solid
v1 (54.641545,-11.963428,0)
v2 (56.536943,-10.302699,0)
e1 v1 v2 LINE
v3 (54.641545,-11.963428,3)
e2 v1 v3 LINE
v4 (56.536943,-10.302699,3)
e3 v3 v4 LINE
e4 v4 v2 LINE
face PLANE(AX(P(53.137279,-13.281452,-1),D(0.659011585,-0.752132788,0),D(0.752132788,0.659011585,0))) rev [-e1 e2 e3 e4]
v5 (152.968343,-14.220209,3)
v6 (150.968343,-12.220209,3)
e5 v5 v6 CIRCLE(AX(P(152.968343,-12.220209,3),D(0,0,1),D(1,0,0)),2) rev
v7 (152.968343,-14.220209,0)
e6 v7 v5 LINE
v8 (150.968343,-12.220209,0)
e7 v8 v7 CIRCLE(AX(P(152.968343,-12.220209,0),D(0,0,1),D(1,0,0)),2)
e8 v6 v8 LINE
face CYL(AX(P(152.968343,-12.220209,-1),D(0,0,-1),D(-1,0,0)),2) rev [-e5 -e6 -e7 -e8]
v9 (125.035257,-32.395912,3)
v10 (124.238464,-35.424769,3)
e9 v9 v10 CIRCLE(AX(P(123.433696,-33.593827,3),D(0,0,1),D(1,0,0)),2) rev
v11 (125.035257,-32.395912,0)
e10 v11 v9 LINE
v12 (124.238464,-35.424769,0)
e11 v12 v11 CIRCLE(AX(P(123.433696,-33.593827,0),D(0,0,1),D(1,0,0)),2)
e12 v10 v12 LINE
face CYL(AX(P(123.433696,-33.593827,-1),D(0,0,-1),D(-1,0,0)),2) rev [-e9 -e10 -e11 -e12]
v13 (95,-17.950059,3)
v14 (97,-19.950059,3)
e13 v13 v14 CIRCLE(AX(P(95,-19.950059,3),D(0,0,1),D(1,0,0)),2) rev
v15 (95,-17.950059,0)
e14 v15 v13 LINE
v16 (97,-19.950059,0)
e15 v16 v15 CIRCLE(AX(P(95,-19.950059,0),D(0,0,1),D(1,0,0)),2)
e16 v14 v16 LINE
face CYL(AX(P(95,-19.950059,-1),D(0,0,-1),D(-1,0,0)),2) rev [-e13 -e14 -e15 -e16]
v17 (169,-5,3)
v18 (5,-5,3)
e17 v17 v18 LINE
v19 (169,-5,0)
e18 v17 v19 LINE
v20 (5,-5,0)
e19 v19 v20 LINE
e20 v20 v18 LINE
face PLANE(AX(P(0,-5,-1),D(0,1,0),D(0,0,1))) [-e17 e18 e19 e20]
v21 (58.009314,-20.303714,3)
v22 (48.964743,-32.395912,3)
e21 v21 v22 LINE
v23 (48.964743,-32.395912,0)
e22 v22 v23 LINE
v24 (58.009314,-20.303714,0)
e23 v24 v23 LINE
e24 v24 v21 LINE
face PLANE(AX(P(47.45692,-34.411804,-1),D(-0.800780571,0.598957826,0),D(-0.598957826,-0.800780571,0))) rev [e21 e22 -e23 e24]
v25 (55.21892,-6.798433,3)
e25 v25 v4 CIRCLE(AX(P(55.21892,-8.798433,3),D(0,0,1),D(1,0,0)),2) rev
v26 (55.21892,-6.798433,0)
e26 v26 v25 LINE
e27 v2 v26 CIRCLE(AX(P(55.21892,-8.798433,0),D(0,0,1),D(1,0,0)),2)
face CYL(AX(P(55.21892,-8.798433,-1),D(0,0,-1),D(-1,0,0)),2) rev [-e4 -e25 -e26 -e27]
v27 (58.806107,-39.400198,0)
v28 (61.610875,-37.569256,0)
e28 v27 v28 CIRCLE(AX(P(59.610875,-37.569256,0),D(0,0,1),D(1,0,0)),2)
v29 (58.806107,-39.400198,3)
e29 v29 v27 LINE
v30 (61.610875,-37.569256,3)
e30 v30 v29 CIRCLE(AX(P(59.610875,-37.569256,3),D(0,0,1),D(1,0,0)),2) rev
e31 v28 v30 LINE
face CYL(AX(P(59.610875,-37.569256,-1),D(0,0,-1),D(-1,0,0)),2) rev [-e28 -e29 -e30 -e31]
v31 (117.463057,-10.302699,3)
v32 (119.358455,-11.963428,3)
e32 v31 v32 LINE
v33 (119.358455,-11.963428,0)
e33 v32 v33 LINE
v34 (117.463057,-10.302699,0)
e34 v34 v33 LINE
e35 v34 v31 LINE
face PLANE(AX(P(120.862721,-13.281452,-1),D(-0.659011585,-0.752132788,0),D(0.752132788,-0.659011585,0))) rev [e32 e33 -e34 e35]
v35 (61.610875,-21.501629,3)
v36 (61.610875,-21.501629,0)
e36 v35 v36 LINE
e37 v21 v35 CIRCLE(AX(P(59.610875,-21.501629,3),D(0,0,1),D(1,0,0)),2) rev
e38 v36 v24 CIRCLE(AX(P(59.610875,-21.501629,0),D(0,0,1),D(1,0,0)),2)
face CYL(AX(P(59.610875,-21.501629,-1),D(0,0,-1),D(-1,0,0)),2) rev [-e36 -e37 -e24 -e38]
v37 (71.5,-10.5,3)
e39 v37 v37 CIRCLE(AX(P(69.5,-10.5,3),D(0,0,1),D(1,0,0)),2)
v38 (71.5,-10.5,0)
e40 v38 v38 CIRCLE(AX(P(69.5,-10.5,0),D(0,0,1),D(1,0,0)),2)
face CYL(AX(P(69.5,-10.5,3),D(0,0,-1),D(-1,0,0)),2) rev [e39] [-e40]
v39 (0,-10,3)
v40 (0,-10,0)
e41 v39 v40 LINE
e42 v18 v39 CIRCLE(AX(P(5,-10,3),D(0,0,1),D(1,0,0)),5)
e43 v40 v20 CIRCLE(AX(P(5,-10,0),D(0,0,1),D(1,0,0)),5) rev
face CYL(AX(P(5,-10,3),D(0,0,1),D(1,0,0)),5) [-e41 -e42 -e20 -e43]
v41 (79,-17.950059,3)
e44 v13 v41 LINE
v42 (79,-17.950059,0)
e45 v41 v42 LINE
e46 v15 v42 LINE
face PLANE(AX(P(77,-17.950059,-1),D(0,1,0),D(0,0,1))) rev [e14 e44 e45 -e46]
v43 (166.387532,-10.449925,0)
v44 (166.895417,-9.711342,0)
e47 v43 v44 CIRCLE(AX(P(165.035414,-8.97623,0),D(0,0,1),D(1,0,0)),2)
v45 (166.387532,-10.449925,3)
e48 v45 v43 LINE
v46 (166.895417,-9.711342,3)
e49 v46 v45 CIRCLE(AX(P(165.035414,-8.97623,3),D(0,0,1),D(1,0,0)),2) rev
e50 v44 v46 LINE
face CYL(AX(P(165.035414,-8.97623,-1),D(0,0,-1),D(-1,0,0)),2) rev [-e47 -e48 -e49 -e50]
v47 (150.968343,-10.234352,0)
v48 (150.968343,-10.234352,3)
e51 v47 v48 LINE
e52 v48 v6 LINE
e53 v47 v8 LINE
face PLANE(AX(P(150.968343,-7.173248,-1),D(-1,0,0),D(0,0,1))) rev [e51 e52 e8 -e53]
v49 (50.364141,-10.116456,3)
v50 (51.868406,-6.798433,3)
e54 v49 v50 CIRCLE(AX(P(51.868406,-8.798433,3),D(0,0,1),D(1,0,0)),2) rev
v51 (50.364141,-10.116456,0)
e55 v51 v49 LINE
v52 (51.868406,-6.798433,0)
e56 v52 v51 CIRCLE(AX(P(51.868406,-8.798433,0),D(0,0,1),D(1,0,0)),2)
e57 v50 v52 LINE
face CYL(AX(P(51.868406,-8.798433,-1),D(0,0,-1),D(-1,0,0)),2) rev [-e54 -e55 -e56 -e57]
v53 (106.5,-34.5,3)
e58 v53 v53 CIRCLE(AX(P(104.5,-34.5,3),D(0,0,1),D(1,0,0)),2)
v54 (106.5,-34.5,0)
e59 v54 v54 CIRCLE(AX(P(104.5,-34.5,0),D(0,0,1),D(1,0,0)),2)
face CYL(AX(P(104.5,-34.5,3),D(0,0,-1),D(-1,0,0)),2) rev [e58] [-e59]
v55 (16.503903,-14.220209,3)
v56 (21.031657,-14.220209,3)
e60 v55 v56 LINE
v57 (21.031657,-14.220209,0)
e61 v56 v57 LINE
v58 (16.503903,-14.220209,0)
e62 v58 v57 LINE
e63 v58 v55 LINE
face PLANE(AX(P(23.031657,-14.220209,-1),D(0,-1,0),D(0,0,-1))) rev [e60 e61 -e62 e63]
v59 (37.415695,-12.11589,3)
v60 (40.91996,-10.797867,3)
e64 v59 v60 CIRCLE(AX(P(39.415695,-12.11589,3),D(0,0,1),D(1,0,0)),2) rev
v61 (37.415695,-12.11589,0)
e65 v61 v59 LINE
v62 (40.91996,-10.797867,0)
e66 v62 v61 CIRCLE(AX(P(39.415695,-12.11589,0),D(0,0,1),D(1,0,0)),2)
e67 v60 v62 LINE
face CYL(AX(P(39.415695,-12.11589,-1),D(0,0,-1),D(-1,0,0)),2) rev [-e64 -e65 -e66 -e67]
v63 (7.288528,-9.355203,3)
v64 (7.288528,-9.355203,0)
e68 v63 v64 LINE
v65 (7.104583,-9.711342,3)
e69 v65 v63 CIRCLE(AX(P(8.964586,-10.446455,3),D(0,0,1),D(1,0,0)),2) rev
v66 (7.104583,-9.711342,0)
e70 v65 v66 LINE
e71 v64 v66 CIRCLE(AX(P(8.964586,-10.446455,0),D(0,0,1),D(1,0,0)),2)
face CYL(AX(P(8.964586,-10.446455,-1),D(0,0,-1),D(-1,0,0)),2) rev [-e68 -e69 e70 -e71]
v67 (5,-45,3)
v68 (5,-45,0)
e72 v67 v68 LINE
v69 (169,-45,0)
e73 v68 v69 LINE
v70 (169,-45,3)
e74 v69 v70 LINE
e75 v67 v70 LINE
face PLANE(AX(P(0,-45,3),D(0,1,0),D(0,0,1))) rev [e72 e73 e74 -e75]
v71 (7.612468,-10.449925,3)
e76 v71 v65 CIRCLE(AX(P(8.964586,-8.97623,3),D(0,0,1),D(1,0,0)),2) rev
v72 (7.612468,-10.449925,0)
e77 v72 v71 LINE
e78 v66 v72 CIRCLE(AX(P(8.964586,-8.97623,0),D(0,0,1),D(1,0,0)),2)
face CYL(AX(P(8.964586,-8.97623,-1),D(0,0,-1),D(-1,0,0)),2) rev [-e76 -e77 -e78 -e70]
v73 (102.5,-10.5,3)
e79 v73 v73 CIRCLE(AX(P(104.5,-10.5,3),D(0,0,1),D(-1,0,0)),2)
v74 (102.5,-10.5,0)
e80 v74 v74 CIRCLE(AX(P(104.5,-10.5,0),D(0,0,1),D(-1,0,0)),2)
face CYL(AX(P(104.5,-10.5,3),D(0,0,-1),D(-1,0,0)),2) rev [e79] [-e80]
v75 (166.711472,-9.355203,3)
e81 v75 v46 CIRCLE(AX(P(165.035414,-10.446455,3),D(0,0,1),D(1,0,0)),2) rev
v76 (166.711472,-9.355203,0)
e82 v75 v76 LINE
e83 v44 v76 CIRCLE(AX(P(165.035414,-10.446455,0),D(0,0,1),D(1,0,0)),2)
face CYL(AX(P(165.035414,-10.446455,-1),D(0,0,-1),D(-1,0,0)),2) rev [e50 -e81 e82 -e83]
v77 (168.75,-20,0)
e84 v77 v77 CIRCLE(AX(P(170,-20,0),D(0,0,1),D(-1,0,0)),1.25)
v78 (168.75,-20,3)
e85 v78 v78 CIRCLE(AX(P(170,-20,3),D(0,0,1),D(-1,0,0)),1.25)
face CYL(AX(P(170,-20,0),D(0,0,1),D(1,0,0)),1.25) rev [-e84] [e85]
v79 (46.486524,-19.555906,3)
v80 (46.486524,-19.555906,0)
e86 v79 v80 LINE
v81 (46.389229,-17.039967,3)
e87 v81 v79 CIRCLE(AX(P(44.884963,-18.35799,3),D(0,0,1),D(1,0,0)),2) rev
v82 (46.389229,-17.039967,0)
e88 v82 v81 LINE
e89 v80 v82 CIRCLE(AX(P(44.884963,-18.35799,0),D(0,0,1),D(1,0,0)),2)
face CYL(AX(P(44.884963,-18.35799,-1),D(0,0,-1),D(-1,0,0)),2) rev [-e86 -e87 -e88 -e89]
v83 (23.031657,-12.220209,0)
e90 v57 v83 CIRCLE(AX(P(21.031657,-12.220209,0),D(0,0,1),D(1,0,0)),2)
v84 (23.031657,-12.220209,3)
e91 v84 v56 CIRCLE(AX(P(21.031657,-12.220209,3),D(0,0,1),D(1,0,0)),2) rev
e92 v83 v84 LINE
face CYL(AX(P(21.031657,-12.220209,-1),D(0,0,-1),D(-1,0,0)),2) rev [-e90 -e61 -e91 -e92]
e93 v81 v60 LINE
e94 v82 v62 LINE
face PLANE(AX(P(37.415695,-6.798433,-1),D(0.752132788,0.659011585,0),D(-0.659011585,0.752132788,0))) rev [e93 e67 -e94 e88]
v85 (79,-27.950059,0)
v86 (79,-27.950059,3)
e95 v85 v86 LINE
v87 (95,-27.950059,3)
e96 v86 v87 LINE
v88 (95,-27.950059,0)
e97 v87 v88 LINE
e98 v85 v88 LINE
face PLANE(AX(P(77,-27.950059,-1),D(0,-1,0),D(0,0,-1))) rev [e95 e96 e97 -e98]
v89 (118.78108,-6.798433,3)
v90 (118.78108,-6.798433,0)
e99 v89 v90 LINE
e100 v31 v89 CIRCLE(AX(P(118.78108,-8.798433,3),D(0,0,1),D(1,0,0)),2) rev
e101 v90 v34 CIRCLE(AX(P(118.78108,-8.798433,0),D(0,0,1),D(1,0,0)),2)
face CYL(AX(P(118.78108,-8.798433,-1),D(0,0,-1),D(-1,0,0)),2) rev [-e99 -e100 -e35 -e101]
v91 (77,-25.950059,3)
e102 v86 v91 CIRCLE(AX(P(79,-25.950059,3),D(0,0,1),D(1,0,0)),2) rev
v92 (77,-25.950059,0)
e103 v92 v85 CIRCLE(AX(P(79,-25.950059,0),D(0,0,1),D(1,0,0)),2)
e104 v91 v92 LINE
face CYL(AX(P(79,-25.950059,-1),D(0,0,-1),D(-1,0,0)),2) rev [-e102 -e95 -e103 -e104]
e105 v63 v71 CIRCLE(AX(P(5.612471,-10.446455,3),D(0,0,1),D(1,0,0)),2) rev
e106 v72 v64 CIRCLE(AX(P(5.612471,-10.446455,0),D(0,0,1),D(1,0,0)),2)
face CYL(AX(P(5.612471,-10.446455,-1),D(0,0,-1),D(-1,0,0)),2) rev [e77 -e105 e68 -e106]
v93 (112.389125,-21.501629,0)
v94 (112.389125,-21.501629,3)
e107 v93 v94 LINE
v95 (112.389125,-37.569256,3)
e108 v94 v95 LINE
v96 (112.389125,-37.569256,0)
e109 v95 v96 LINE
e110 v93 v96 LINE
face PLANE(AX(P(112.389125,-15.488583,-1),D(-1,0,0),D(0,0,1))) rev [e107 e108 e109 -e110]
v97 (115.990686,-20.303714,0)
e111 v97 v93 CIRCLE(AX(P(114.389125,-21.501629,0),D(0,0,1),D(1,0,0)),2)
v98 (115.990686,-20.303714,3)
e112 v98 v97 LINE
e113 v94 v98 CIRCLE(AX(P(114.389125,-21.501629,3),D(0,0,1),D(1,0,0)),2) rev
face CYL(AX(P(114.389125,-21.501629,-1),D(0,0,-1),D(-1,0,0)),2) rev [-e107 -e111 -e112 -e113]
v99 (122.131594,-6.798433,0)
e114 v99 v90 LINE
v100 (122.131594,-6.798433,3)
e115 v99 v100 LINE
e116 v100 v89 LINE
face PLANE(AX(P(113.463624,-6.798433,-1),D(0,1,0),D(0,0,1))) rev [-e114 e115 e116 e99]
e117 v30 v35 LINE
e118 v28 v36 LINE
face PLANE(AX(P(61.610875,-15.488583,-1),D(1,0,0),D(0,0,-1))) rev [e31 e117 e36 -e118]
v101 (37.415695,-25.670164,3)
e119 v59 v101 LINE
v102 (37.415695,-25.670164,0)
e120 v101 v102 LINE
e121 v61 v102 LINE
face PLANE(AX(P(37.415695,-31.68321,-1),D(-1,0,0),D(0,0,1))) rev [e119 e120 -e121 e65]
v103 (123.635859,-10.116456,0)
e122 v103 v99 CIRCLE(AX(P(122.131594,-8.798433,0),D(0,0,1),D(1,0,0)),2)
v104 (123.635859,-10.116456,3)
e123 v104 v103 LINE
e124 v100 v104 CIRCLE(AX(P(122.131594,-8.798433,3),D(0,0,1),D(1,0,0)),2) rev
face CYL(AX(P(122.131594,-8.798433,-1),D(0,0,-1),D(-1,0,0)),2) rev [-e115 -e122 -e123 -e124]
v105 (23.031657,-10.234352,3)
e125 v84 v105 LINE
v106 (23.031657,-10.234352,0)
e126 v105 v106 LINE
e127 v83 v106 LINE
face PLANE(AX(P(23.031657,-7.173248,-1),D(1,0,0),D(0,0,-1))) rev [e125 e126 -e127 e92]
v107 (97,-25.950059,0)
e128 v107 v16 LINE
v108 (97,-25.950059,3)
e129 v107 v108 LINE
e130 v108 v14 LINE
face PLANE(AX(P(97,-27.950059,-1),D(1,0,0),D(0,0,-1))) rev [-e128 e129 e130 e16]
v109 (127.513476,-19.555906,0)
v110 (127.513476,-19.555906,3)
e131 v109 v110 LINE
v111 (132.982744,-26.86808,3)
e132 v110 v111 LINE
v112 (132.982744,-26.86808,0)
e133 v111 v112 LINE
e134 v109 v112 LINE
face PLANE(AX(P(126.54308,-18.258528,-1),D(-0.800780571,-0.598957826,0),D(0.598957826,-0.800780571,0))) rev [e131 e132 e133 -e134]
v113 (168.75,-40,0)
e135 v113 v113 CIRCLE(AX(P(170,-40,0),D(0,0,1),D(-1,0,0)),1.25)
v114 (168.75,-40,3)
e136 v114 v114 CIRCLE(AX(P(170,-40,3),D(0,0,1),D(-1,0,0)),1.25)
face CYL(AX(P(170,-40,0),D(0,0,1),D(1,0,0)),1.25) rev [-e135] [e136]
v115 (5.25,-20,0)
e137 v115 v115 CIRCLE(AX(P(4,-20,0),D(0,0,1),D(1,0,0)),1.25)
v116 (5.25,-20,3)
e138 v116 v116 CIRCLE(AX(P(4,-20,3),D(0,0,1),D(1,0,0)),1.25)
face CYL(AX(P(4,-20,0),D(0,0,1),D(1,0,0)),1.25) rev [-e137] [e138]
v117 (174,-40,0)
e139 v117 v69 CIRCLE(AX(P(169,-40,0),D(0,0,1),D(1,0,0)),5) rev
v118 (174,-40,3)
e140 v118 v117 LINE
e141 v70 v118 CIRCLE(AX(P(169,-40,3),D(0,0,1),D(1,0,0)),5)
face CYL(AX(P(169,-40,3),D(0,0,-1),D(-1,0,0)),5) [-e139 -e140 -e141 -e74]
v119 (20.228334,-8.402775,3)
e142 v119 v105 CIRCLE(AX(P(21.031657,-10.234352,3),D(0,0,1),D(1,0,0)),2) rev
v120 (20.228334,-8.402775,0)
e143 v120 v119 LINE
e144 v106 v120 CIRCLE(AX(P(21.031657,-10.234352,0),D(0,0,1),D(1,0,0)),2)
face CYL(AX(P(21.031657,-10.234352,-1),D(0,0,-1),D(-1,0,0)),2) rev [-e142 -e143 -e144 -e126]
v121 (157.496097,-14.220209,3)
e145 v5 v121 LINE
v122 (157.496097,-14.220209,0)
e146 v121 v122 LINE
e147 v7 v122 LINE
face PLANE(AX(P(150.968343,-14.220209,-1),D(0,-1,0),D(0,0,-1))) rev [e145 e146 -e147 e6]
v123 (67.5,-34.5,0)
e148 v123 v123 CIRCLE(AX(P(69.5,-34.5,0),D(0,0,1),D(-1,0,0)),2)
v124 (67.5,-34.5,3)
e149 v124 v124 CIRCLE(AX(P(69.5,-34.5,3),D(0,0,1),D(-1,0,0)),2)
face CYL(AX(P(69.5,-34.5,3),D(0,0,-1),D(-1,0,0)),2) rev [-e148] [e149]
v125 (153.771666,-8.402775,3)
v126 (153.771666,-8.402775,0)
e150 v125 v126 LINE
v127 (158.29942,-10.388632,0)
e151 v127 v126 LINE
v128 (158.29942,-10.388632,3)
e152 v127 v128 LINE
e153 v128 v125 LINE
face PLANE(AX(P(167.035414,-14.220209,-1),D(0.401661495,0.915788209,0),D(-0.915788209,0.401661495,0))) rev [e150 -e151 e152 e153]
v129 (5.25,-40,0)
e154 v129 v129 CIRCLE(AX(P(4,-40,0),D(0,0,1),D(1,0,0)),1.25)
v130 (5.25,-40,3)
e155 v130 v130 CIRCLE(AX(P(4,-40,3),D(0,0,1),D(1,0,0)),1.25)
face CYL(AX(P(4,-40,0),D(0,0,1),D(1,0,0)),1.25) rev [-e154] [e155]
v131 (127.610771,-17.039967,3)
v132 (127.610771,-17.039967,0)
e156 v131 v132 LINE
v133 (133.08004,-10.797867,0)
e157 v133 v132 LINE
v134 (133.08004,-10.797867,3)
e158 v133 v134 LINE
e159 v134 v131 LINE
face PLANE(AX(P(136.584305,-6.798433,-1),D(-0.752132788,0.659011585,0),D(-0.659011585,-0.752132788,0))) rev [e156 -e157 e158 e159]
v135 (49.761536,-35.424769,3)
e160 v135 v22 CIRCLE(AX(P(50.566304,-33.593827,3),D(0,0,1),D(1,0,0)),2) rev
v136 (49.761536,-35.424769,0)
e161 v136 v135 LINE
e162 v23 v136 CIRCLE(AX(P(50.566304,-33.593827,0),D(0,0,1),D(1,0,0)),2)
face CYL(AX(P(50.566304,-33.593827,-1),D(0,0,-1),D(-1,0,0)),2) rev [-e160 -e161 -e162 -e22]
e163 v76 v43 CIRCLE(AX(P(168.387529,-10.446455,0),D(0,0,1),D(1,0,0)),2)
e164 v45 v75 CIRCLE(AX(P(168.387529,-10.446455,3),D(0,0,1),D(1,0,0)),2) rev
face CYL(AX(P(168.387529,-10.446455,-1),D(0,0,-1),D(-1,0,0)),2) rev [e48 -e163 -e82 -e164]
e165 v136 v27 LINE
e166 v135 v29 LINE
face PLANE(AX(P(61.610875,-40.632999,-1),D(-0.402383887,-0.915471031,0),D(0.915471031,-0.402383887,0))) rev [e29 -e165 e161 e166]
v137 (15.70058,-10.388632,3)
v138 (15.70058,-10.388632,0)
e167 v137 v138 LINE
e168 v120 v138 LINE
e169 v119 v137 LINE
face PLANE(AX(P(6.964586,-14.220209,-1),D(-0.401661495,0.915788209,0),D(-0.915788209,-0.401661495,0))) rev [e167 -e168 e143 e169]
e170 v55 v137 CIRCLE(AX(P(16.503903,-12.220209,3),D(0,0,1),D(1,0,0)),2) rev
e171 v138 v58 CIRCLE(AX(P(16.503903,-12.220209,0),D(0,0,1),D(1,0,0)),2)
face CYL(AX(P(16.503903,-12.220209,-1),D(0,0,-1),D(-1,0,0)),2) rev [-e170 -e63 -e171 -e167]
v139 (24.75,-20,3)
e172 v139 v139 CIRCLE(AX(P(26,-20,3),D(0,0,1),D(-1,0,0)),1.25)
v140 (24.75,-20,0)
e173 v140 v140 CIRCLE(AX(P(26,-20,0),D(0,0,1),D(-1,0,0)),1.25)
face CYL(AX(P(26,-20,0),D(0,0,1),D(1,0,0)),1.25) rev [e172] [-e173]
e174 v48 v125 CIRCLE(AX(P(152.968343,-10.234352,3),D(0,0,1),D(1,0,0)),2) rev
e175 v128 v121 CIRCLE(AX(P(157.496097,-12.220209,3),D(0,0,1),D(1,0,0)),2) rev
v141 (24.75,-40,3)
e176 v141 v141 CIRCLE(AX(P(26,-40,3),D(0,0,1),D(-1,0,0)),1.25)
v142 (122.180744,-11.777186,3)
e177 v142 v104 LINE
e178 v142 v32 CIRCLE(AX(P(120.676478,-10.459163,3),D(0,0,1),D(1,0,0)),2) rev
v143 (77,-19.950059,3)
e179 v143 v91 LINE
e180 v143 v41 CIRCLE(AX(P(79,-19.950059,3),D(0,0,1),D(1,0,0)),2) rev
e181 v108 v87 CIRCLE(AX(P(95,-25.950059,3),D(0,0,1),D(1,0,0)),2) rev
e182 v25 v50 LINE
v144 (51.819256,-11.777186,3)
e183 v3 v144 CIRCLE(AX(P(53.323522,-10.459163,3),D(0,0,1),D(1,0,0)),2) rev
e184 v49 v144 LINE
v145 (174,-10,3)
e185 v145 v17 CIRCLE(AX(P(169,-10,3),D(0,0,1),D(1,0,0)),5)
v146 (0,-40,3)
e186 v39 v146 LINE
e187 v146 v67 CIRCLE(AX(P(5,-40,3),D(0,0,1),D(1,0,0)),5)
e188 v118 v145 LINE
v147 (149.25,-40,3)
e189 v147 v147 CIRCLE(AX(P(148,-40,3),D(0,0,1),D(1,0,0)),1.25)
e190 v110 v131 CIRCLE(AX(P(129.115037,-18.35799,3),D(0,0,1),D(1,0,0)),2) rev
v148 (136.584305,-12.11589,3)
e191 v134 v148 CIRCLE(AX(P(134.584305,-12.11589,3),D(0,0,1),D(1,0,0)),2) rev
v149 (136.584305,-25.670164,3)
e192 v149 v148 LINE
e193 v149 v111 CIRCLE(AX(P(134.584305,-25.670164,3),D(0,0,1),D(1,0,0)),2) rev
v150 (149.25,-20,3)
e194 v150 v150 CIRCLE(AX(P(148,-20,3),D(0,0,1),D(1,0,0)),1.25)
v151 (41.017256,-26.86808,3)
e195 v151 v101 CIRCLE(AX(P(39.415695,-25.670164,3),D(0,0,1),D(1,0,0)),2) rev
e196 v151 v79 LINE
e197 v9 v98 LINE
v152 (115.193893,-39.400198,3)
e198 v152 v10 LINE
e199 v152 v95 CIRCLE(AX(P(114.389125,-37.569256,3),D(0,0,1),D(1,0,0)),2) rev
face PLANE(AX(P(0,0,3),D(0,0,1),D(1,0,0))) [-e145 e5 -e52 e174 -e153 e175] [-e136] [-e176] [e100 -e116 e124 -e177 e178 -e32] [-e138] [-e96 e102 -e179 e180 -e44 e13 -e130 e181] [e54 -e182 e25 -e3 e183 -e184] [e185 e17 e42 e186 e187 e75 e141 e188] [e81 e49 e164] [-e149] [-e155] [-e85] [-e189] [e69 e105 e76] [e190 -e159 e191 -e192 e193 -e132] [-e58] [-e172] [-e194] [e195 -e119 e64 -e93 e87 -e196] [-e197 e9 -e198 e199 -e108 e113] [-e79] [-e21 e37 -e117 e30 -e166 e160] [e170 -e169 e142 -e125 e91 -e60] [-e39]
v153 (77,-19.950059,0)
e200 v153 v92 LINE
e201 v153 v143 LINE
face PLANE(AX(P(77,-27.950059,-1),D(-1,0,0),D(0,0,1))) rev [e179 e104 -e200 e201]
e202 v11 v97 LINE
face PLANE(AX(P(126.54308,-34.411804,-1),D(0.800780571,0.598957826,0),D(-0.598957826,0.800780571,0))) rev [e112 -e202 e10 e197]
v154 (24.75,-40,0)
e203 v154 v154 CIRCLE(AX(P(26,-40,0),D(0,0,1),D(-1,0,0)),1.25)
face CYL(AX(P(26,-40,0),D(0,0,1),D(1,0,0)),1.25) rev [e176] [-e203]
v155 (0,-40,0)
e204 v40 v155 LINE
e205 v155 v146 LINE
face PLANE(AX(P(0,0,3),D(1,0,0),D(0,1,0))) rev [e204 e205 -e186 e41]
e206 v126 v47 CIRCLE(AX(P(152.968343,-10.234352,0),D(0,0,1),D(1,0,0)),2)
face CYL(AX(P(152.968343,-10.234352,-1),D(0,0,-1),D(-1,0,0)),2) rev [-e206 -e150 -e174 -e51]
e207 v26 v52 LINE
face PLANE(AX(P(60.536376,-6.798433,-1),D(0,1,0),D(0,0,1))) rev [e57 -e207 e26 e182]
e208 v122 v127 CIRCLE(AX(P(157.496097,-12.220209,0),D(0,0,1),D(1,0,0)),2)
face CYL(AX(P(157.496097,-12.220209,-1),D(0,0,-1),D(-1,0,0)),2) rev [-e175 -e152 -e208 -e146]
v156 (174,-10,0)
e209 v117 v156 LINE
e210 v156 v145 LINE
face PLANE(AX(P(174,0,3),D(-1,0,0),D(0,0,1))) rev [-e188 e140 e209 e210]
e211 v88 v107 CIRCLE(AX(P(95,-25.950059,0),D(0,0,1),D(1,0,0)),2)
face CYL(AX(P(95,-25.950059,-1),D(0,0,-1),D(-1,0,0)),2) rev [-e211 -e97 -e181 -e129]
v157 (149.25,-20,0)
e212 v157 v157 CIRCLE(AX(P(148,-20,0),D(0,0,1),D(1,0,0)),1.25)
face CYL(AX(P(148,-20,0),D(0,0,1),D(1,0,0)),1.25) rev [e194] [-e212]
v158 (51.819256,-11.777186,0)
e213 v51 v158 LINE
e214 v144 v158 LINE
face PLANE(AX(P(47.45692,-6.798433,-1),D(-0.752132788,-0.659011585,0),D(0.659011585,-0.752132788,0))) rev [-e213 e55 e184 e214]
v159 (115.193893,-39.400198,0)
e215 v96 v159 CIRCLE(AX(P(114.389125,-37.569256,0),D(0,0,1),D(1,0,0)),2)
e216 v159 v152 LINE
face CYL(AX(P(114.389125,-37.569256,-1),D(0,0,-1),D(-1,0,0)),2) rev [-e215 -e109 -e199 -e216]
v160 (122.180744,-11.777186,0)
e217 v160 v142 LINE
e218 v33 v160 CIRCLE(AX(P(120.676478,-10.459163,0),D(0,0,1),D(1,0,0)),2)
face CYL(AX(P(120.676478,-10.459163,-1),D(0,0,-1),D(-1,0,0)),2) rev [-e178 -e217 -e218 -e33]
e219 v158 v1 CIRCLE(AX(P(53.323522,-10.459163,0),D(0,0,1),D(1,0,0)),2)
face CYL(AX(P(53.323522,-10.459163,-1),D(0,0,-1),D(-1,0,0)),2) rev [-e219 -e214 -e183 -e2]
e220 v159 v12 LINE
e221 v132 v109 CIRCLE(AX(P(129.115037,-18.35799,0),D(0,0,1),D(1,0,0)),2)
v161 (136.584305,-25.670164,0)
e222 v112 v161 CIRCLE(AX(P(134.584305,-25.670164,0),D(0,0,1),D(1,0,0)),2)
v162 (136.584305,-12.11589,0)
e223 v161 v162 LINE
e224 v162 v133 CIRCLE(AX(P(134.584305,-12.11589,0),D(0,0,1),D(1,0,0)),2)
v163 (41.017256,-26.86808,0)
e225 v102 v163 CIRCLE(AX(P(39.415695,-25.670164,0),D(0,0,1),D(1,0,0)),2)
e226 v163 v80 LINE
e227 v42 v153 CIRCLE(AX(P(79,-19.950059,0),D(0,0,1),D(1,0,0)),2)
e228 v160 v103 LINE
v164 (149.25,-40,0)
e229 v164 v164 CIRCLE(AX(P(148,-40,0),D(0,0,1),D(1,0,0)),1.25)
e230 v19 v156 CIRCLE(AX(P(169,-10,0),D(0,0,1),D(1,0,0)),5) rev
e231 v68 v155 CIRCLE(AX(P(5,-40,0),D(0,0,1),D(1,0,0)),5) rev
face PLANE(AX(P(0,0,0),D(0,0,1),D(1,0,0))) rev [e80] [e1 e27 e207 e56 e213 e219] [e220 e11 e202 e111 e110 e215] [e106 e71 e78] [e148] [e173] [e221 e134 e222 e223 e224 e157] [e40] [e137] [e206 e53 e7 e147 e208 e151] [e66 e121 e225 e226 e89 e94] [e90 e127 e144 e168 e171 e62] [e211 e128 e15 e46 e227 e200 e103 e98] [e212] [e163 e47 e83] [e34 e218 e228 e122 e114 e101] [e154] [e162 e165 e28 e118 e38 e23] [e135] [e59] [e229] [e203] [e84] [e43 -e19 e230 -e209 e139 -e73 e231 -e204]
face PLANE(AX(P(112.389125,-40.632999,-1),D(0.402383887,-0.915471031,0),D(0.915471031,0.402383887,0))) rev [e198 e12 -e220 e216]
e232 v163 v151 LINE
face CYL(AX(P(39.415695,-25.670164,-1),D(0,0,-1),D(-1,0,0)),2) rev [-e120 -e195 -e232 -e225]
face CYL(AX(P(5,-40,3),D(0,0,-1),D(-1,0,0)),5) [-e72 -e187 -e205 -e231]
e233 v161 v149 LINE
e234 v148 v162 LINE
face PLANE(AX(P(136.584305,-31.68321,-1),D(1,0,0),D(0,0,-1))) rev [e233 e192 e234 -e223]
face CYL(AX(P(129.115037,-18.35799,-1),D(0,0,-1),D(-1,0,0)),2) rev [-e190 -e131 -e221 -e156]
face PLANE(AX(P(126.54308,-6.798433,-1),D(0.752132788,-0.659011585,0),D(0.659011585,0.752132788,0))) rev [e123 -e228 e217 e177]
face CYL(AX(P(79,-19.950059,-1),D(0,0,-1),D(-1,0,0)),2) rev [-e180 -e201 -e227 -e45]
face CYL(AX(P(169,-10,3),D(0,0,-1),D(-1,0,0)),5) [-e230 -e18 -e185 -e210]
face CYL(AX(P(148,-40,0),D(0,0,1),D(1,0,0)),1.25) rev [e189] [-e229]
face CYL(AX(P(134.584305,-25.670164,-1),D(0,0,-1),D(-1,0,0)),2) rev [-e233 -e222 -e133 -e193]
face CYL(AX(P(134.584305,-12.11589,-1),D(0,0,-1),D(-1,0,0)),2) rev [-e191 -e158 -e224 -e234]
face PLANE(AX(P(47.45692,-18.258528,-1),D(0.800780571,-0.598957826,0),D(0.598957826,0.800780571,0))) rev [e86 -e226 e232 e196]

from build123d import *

# Parameters (mm, degrees)
SKETCH_1_W          = 174
SKETCH_1_H          = 45
SKETCH_1_R          = 2
EXTRUDE_1_DEPTH     = 3
SKETCH_2_R          = 1.25
CUT_EXTRUDE_1_DEPTH = 3
SKETCH_3_W          = 20
SKETCH_3_H          = 10
CUT_EXTRUDE_2_DEPTH = 4
FILLET_1_R          = 2
FILLET_2_R          = 5
SKETCH_4_W          = 93.235772227
SKETCH_4_H          = 5
CUT_EXTRUDE_3_DEPTH = 4
FILLET_3_R          = 5


with BuildPart() as part:
    # 草图1 → 凸台-拉伸1 (new body)
    with BuildSketch(Plane.XY):
        with Locations((87, -22.5)):
            Rectangle(SKETCH_1_W, SKETCH_1_H)
        with Locations((69.5, -10.5)):
            Circle(SKETCH_1_R, mode=Mode.SUBTRACT)
        with Locations(Location((104.5, -10.5, 0), (0, 0, 180))):
            Circle(SKETCH_1_R, mode=Mode.SUBTRACT)
        with Locations(Location((69.5, -34.5, 0), (0, 0, 180))):
            Circle(SKETCH_1_R, mode=Mode.SUBTRACT)
        with Locations((104.5, -34.5)):
            Circle(SKETCH_1_R, mode=Mode.SUBTRACT)
    extrude(amount=EXTRUDE_1_DEPTH)

    # 草图2 → 切除-拉伸1 (cut)
    with BuildSketch(Plane.XY.offset(3)):
        with Locations((148, -20)):
            Circle(SKETCH_2_R)
        with Locations((148, -40)):
            Circle(SKETCH_2_R)
        with Locations(Location((26, -40, 0), (0, 0, 180))):
            Circle(SKETCH_2_R)
        with Locations(Location((26, -20, 0), (0, 0, 180))):
            Circle(SKETCH_2_R)
        with Locations((4, -20)):
            Circle(SKETCH_2_R)
        with Locations((4, -40)):
            Circle(SKETCH_2_R)
        with Locations(Location((170, -40, 0), (0, 0, 180))):
            Circle(SKETCH_2_R)
        with Locations(Location((170, -20, 0), (0, 0, 180))):
            Circle(SKETCH_2_R)
    extrude(amount=-CUT_EXTRUDE_1_DEPTH, mode=Mode.SUBTRACT)

    # 草图3 → 切除-拉伸2 (cut)
    with BuildSketch(Plane.XY.offset(3)):
        Polygon((6.964585687, -8.446455347), (15.15178831, -8.446455347), (6.964585687, -12.03733369), align=None)
        Polygon((6.964585687, -14.220208877), (23.031657012, -7.17324777), (23.031657012, -14.220208877), align=None)
        Polygon((37.415694542, -6.798433242), (47.456920401, -18.258527972), (37.415694542, -31.683210371), align=None)
        Polygon((47.456920401, -6.798433242), (53.137279326, -13.281451581), (60.536376343, -6.798433242), align=None)
        Polygon((47.456920401, -34.411804354), (61.610874696, -15.488582851), (61.610874696, -40.632998636), align=None)
        Polygon((112.389125304, -40.632998636), (126.543079599, -34.411804354), (112.389125304, -15.488582851), align=None)
        Polygon((113.463623657, -6.798433242), (126.543079599, -6.798433242), (120.862720674, -13.281451581), align=None)
        Polygon((136.584305458, -31.683210371), (136.584305458, -6.798433242), (126.543079599, -18.258527972), align=None)
        Polygon((150.968342988, -14.220208877), (167.035414313, -14.220208877), (150.968342988, -7.17324777), align=None)
        Polygon((167.035414313, -12.03733369), (167.035414313, -8.446455347), (158.84821169, -8.446455347), align=None)
        with Locations((87, -22.950058647)):
            Rectangle(SKETCH_3_W, SKETCH_3_H)
    extrude(amount=-CUT_EXTRUDE_2_DEPTH, mode=Mode.SUBTRACT)

    # 圆角1
    # the kernel refuses this fillet: 2 mm, written as the material it adds along each edge
    with BuildSketch(Plane(origin=(15.15178831, -8.446455347, 3), x_dir=(-0.9157882087939493, -0.40166149508506527, 0), z_dir=(0, 0, -1)), Plane(origin=(167.035414313, -14.220208877, 3), x_dir=(-1, 0, 0), z_dir=(0, 0, -1))) as fillet_1_piece_1:
        with BuildLine():
            CenterArc((FILLET_1_R * 4.76965861114, FILLET_1_R), FILLET_1_R, 113.682087725, 156.317912275)
            Line((FILLET_1_R * 4.36799711605, FILLET_1_R * 1.91578820879), (0, 0))
            Line((0, 0), (FILLET_1_R * 4.76965861114, 0))
        make_face()
    extrude(amount=3)
    with BuildSketch(Plane(origin=(6.964585687, -12.03733369, 3), x_dir=(0.9157882087939492, 0.4016614950850657, 0), z_dir=(0, 0, -1)), Plane(origin=(167.035414313, -12.03733369, 3), x_dir=(0, 1, 0), z_dir=(0, 0, -1)), Plane(origin=(150.968342988, -7.17324777, 3), x_dir=(0, -1, 0), z_dir=(0, 0, -1))) as fillet_1_piece_2:
        with BuildLine():
            CenterArc((FILLET_1_R * 1.53055202243, -FILLET_1_R), FILLET_1_R, 90, 113.682087725)
            Line((FILLET_1_R * 0.614763813634, -FILLET_1_R * 1.40166149509), (0, 0))
            Line((0, 0), (FILLET_1_R * 1.53055202243, 0))
        make_face()
    extrude(amount=3)
    with BuildSketch(Plane(origin=(6.964585687, -8.446455347, 3), x_dir=(0, -1, 0), z_dir=(0, 0, -1)), Plane(origin=(77, -27.950058647, 3), x_dir=(1, 0, 0), z_dir=(0, 0, -1)), Plane(origin=(77, -17.950058647, 3), x_dir=(0, -1, 0), z_dir=(0, 0, -1)), Plane(origin=(97, -17.950058647, 3), x_dir=(-1, 0, 0), z_dir=(0, 0, -1)), Plane(origin=(120.862720674, -13.281451581, 3), x_dir=(0.6590115853993712, 0.752132787684068, 0), z_dir=(0, 0, -1)), Plane(origin=(150.968342988, -14.220208877, 3), x_dir=(1, 0, 0), z_dir=(0, 0, -1)), Plane(origin=(23.031657012, -14.220208877, 3), x_dir=(0, 1, 0), z_dir=(0, 0, -1))) as fillet_1_piece_3:
        with BuildLine():
            CenterArc((FILLET_1_R, -FILLET_1_R), FILLET_1_R, 90, 90)
            Line((0, -FILLET_1_R), (0, 0))
            Line((0, 0), (FILLET_1_R, 0))
        make_face()
    extrude(amount=3)
    with BuildSketch(Plane(origin=(97, -27.950058647, 3), x_dir=(-1, 0, 0), z_dir=(0, 0, -1)), Plane(origin=(167.035414313, -8.446455347, 3), x_dir=(0, -1, 0), z_dir=(0, 0, -1)), Plane(origin=(53.137279326, -13.281451581, 3), x_dir=(-0.6590115853993732, 0.7521327876840662, 0), z_dir=(0, 0, -1))) as fillet_1_piece_4:
        with BuildLine():
            CenterArc((FILLET_1_R, FILLET_1_R), FILLET_1_R, 180, 90)
            Line((0, FILLET_1_R), (0, 0))
            Line((0, 0), (FILLET_1_R, 0))
        make_face()
    extrude(amount=3)
    with BuildSketch(Plane(origin=(158.84821169, -8.446455347, 3), x_dir=(0.9157882087939491, -0.40166149508506555, 0), z_dir=(0, 0, -1)), Plane(origin=(6.964585687, -14.220208877, 3), x_dir=(1, 0, 0), z_dir=(0, 0, -1))) as fillet_1_piece_5:
        with BuildLine():
            CenterArc((FILLET_1_R * 4.76965861114, -FILLET_1_R), FILLET_1_R, 90, 156.317912275)
            Line((FILLET_1_R * 4.36799711605, -FILLET_1_R * 1.91578820879), (0, 0))
            Line((0, 0), (FILLET_1_R * 4.76965861114, 0))
        make_face()
    extrude(amount=3)
    with BuildSketch(Plane(origin=(126.543079599, -34.411804354, 3), x_dir=(-0.9154710305438037, -0.40238388664938624, 0), z_dir=(0, 0, -1))) as fillet_1_piece_6:
        with BuildLine():
            CenterArc((FILLET_1_R * 1.25870478162, FILLET_1_R), FILLET_1_R, 166.931997768, 103.068002232)
            Line((FILLET_1_R * 0.284602389093, FILLET_1_R * 1.22610733927), (0, 0))
            Line((0, 0), (FILLET_1_R * 1.25870478162, 0))
        make_face()
    extrude(amount=3)
    with BuildSketch(Plane(origin=(112.389125304, -40.632998636, 3), x_dir=(0.9154710305438044, 0.4023838866493844, 0), z_dir=(0, 0, -1)), Plane(origin=(61.610874696, -40.632998636, 3), x_dir=(0, 1, 0), z_dir=(0, 0, -1))) as fillet_1_piece_7:
        with BuildLine():
            CenterArc((FILLET_1_R * 1.53187139719, -FILLET_1_R), FILLET_1_R, 90, 113.727291576)
            Line((FILLET_1_R * 0.61640036665, -FILLET_1_R * 1.40238388665), (0, 0))
            Line((0, 0), (FILLET_1_R * 1.53187139719, 0))
        make_face()
    extrude(amount=3)
    with BuildSketch(Plane(origin=(112.389125304, -15.488582851, 3), x_dir=(0, -1, 0), z_dir=(0, 0, -1)), Plane(origin=(136.584305458, -31.683210371, 3), x_dir=(0, 1, 0), z_dir=(0, 0, -1)), Plane(origin=(37.415694542, -31.683210371, 3), x_dir=(0.5989578255907083, 0.8007805711701868, 0), z_dir=(0, 0, -1))) as fillet_1_piece_8:
        with BuildLine():
            CenterArc((FILLET_1_R * 3.00652315444, -FILLET_1_R), FILLET_1_R, 90, 143.204706192)
            Line((FILLET_1_R * 2.40756532885, -FILLET_1_R * 1.80078057117), (0, 0))
            Line((0, 0), (FILLET_1_R * 3.00652315444, 0))
        make_face()
    extrude(amount=3)
    with BuildSketch(Plane(origin=(126.543079599, -6.798433242, 3), x_dir=(-0.6590115853993721, -0.7521327876840671, 0), z_dir=(0, 0, -1))) as fillet_1_piece_9:
        with BuildLine():
            CenterArc((FILLET_1_R * 2.2057429387, FILLET_1_R), FILLET_1_R, 138.775465824, 131.224534176)
            Line((FILLET_1_R * 1.45361015102, FILLET_1_R * 1.6590115854), (0, 0))
            Line((0, 0), (FILLET_1_R * 2.2057429387, 0))
        make_face()
    extrude(amount=3)
    with BuildSketch(Plane(origin=(113.463623657, -6.798433242, 3), x_dir=(0.752132787684067, -0.6590115853993724, 0), z_dir=(0, 0, -1)), Plane(origin=(37.415694542, -6.798433242, 3), x_dir=(0, -1, 0), z_dir=(0, 0, -1)), Plane(origin=(60.536376343, -6.798433242, 3), x_dir=(-1, 0, 0), z_dir=(0, 0, -1))) as fillet_1_piece_10:
        with BuildLine():
            CenterArc((FILLET_1_R * 2.65872835395, -FILLET_1_R), FILLET_1_R, 90, 138.775465824)
            Line((FILLET_1_R * 1.99971676855, -FILLET_1_R * 1.75213278768), (0, 0))
            Line((0, 0), (FILLET_1_R * 2.65872835395, 0))
        make_face()
    extrude(amount=3)
    with BuildSketch(Plane(origin=(136.584305458, -6.798433242, 3), x_dir=(0, -1, 0), z_dir=(0, 0, -1))) as fillet_1_piece_11:
        with BuildLine():
            CenterArc((FILLET_1_R * 2.65872835395, FILLET_1_R), FILLET_1_R, 131.224534176, 138.775465824)
            Line((FILLET_1_R * 1.99971676855, FILLET_1_R * 1.75213278768), (0, 0))
            Line((0, 0), (FILLET_1_R * 2.65872835395, 0))
        make_face()
    extrude(amount=3)
    with BuildSketch(Plane(origin=(23.031657012, -7.17324777, 3), x_dir=(0, -1, 0), z_dir=(0, 0, -1))) as fillet_1_piece_12:
        with BuildLine():
            CenterArc((FILLET_1_R * 1.53055202243, FILLET_1_R), FILLET_1_R, 156.317912275, 113.682087725)
            Line((FILLET_1_R * 0.614763813634, FILLET_1_R * 1.40166149509), (0, 0))
            Line((0, 0), (FILLET_1_R * 1.53055202243, 0))
        make_face()
    extrude(amount=3)
    with BuildSketch(Plane(origin=(47.456920401, -18.258527972, 3), x_dir=(-0.5989578255907079, -0.8007805711701871, 0), z_dir=(0, 0, -1))) as fillet_1_piece_13:
        with BuildLine():
            CenterArc((FILLET_1_R * 0.810070570787, FILLET_1_R), FILLET_1_R, 191.980172016, 78.019827984)
            Line((-FILLET_1_R * 0.168148922043, FILLET_1_R * 0.792426822912), (0, 0))
            Line((0, 0), (FILLET_1_R * 0.810070570787, 0))
        make_face()
    extrude(amount=3)
    with BuildSketch(Plane(origin=(47.456920401, -6.798433242, 3), x_dir=(0.6590115853993722, -0.752132787684067, 0), z_dir=(0, 0, -1))) as fillet_1_piece_14:
        with BuildLine():
            CenterArc((FILLET_1_R * 2.2057429387, -FILLET_1_R), FILLET_1_R, 90, 131.224534176)
            Line((FILLET_1_R * 1.45361015102, -FILLET_1_R * 1.6590115854), (0, 0))
            Line((0, 0), (FILLET_1_R * 2.2057429387, 0))
        make_face()
    extrude(amount=3)
    with BuildSketch(Plane(origin=(61.610874696, -15.488582851, 3), x_dir=(0, -1, 0), z_dir=(0, 0, -1))) as fillet_1_piece_15:
        with BuildLine():
            CenterArc((FILLET_1_R * 3.00652315444, FILLET_1_R), FILLET_1_R, 126.795293808, 143.204706192)
            Line((FILLET_1_R * 2.40756532885, FILLET_1_R * 1.80078057117), (0, 0))
            Line((0, 0), (FILLET_1_R * 3.00652315444, 0))
        make_face()
    extrude(amount=3)
    with BuildSketch(Plane(origin=(47.456920401, -34.411804354, 3), x_dir=(0.9154710305438037, -0.40238388664938624, 0), z_dir=(0, 0, -1))) as fillet_1_piece_16:
        with BuildLine():
            CenterArc((FILLET_1_R * 1.25870478162, -FILLET_1_R), FILLET_1_R, 90, 103.068002232)
            Line((FILLET_1_R * 0.284602389093, -FILLET_1_R * 1.22610733927), (0, 0))
            Line((0, 0), (FILLET_1_R * 1.25870478162, 0))
        make_face()
    extrude(amount=3)
    with BuildSketch(Plane(origin=(126.543079599, -18.258527972, 3), x_dir=(0.5989578255907072, -0.8007805711701876, 0), z_dir=(0, 0, -1))) as fillet_1_piece_17:
        with BuildLine():
            CenterArc((FILLET_1_R * 0.810070570787, -FILLET_1_R), FILLET_1_R, 90, 78.019827984)
            Line((-FILLET_1_R * 0.168148922043, -FILLET_1_R * 0.792426822912), (0, 0))
            Line((0, 0), (FILLET_1_R * 0.810070570787, 0))
        make_face()
    extrude(amount=3)

    # 圆角2
    fillet_2_edges = [part.edges().sort_by_distance(p)[0] for p in [
        (0, 0, 1.5),
        (174, 0, 1.5),
        (174, -45, 1.5),
        (0, -45, 1.5),
    ]]
    fillet(fillet_2_edges, radius=FILLET_2_R)

    # 草图4 → 切除-拉伸3 (cut)
    with BuildSketch(Plane.XY.offset(3)):
        with Locations((127.382113887, -2.5)):
            Rectangle(SKETCH_4_W, SKETCH_4_H)
        with Locations((46.617886114, -2.5)):
            Rectangle(SKETCH_4_W, SKETCH_4_H)
    extrude(amount=-CUT_EXTRUDE_3_DEPTH, mode=Mode.SUBTRACT)

    # 圆角3
    fillet_3_edges = [part.edges().sort_by_distance(p)[0] for p in [
        (0, -5, 1.5),
        (174, -5, 1.5),
    ]]
    fillet(fillet_3_edges, radius=FILLET_3_R)


solid = part.part
